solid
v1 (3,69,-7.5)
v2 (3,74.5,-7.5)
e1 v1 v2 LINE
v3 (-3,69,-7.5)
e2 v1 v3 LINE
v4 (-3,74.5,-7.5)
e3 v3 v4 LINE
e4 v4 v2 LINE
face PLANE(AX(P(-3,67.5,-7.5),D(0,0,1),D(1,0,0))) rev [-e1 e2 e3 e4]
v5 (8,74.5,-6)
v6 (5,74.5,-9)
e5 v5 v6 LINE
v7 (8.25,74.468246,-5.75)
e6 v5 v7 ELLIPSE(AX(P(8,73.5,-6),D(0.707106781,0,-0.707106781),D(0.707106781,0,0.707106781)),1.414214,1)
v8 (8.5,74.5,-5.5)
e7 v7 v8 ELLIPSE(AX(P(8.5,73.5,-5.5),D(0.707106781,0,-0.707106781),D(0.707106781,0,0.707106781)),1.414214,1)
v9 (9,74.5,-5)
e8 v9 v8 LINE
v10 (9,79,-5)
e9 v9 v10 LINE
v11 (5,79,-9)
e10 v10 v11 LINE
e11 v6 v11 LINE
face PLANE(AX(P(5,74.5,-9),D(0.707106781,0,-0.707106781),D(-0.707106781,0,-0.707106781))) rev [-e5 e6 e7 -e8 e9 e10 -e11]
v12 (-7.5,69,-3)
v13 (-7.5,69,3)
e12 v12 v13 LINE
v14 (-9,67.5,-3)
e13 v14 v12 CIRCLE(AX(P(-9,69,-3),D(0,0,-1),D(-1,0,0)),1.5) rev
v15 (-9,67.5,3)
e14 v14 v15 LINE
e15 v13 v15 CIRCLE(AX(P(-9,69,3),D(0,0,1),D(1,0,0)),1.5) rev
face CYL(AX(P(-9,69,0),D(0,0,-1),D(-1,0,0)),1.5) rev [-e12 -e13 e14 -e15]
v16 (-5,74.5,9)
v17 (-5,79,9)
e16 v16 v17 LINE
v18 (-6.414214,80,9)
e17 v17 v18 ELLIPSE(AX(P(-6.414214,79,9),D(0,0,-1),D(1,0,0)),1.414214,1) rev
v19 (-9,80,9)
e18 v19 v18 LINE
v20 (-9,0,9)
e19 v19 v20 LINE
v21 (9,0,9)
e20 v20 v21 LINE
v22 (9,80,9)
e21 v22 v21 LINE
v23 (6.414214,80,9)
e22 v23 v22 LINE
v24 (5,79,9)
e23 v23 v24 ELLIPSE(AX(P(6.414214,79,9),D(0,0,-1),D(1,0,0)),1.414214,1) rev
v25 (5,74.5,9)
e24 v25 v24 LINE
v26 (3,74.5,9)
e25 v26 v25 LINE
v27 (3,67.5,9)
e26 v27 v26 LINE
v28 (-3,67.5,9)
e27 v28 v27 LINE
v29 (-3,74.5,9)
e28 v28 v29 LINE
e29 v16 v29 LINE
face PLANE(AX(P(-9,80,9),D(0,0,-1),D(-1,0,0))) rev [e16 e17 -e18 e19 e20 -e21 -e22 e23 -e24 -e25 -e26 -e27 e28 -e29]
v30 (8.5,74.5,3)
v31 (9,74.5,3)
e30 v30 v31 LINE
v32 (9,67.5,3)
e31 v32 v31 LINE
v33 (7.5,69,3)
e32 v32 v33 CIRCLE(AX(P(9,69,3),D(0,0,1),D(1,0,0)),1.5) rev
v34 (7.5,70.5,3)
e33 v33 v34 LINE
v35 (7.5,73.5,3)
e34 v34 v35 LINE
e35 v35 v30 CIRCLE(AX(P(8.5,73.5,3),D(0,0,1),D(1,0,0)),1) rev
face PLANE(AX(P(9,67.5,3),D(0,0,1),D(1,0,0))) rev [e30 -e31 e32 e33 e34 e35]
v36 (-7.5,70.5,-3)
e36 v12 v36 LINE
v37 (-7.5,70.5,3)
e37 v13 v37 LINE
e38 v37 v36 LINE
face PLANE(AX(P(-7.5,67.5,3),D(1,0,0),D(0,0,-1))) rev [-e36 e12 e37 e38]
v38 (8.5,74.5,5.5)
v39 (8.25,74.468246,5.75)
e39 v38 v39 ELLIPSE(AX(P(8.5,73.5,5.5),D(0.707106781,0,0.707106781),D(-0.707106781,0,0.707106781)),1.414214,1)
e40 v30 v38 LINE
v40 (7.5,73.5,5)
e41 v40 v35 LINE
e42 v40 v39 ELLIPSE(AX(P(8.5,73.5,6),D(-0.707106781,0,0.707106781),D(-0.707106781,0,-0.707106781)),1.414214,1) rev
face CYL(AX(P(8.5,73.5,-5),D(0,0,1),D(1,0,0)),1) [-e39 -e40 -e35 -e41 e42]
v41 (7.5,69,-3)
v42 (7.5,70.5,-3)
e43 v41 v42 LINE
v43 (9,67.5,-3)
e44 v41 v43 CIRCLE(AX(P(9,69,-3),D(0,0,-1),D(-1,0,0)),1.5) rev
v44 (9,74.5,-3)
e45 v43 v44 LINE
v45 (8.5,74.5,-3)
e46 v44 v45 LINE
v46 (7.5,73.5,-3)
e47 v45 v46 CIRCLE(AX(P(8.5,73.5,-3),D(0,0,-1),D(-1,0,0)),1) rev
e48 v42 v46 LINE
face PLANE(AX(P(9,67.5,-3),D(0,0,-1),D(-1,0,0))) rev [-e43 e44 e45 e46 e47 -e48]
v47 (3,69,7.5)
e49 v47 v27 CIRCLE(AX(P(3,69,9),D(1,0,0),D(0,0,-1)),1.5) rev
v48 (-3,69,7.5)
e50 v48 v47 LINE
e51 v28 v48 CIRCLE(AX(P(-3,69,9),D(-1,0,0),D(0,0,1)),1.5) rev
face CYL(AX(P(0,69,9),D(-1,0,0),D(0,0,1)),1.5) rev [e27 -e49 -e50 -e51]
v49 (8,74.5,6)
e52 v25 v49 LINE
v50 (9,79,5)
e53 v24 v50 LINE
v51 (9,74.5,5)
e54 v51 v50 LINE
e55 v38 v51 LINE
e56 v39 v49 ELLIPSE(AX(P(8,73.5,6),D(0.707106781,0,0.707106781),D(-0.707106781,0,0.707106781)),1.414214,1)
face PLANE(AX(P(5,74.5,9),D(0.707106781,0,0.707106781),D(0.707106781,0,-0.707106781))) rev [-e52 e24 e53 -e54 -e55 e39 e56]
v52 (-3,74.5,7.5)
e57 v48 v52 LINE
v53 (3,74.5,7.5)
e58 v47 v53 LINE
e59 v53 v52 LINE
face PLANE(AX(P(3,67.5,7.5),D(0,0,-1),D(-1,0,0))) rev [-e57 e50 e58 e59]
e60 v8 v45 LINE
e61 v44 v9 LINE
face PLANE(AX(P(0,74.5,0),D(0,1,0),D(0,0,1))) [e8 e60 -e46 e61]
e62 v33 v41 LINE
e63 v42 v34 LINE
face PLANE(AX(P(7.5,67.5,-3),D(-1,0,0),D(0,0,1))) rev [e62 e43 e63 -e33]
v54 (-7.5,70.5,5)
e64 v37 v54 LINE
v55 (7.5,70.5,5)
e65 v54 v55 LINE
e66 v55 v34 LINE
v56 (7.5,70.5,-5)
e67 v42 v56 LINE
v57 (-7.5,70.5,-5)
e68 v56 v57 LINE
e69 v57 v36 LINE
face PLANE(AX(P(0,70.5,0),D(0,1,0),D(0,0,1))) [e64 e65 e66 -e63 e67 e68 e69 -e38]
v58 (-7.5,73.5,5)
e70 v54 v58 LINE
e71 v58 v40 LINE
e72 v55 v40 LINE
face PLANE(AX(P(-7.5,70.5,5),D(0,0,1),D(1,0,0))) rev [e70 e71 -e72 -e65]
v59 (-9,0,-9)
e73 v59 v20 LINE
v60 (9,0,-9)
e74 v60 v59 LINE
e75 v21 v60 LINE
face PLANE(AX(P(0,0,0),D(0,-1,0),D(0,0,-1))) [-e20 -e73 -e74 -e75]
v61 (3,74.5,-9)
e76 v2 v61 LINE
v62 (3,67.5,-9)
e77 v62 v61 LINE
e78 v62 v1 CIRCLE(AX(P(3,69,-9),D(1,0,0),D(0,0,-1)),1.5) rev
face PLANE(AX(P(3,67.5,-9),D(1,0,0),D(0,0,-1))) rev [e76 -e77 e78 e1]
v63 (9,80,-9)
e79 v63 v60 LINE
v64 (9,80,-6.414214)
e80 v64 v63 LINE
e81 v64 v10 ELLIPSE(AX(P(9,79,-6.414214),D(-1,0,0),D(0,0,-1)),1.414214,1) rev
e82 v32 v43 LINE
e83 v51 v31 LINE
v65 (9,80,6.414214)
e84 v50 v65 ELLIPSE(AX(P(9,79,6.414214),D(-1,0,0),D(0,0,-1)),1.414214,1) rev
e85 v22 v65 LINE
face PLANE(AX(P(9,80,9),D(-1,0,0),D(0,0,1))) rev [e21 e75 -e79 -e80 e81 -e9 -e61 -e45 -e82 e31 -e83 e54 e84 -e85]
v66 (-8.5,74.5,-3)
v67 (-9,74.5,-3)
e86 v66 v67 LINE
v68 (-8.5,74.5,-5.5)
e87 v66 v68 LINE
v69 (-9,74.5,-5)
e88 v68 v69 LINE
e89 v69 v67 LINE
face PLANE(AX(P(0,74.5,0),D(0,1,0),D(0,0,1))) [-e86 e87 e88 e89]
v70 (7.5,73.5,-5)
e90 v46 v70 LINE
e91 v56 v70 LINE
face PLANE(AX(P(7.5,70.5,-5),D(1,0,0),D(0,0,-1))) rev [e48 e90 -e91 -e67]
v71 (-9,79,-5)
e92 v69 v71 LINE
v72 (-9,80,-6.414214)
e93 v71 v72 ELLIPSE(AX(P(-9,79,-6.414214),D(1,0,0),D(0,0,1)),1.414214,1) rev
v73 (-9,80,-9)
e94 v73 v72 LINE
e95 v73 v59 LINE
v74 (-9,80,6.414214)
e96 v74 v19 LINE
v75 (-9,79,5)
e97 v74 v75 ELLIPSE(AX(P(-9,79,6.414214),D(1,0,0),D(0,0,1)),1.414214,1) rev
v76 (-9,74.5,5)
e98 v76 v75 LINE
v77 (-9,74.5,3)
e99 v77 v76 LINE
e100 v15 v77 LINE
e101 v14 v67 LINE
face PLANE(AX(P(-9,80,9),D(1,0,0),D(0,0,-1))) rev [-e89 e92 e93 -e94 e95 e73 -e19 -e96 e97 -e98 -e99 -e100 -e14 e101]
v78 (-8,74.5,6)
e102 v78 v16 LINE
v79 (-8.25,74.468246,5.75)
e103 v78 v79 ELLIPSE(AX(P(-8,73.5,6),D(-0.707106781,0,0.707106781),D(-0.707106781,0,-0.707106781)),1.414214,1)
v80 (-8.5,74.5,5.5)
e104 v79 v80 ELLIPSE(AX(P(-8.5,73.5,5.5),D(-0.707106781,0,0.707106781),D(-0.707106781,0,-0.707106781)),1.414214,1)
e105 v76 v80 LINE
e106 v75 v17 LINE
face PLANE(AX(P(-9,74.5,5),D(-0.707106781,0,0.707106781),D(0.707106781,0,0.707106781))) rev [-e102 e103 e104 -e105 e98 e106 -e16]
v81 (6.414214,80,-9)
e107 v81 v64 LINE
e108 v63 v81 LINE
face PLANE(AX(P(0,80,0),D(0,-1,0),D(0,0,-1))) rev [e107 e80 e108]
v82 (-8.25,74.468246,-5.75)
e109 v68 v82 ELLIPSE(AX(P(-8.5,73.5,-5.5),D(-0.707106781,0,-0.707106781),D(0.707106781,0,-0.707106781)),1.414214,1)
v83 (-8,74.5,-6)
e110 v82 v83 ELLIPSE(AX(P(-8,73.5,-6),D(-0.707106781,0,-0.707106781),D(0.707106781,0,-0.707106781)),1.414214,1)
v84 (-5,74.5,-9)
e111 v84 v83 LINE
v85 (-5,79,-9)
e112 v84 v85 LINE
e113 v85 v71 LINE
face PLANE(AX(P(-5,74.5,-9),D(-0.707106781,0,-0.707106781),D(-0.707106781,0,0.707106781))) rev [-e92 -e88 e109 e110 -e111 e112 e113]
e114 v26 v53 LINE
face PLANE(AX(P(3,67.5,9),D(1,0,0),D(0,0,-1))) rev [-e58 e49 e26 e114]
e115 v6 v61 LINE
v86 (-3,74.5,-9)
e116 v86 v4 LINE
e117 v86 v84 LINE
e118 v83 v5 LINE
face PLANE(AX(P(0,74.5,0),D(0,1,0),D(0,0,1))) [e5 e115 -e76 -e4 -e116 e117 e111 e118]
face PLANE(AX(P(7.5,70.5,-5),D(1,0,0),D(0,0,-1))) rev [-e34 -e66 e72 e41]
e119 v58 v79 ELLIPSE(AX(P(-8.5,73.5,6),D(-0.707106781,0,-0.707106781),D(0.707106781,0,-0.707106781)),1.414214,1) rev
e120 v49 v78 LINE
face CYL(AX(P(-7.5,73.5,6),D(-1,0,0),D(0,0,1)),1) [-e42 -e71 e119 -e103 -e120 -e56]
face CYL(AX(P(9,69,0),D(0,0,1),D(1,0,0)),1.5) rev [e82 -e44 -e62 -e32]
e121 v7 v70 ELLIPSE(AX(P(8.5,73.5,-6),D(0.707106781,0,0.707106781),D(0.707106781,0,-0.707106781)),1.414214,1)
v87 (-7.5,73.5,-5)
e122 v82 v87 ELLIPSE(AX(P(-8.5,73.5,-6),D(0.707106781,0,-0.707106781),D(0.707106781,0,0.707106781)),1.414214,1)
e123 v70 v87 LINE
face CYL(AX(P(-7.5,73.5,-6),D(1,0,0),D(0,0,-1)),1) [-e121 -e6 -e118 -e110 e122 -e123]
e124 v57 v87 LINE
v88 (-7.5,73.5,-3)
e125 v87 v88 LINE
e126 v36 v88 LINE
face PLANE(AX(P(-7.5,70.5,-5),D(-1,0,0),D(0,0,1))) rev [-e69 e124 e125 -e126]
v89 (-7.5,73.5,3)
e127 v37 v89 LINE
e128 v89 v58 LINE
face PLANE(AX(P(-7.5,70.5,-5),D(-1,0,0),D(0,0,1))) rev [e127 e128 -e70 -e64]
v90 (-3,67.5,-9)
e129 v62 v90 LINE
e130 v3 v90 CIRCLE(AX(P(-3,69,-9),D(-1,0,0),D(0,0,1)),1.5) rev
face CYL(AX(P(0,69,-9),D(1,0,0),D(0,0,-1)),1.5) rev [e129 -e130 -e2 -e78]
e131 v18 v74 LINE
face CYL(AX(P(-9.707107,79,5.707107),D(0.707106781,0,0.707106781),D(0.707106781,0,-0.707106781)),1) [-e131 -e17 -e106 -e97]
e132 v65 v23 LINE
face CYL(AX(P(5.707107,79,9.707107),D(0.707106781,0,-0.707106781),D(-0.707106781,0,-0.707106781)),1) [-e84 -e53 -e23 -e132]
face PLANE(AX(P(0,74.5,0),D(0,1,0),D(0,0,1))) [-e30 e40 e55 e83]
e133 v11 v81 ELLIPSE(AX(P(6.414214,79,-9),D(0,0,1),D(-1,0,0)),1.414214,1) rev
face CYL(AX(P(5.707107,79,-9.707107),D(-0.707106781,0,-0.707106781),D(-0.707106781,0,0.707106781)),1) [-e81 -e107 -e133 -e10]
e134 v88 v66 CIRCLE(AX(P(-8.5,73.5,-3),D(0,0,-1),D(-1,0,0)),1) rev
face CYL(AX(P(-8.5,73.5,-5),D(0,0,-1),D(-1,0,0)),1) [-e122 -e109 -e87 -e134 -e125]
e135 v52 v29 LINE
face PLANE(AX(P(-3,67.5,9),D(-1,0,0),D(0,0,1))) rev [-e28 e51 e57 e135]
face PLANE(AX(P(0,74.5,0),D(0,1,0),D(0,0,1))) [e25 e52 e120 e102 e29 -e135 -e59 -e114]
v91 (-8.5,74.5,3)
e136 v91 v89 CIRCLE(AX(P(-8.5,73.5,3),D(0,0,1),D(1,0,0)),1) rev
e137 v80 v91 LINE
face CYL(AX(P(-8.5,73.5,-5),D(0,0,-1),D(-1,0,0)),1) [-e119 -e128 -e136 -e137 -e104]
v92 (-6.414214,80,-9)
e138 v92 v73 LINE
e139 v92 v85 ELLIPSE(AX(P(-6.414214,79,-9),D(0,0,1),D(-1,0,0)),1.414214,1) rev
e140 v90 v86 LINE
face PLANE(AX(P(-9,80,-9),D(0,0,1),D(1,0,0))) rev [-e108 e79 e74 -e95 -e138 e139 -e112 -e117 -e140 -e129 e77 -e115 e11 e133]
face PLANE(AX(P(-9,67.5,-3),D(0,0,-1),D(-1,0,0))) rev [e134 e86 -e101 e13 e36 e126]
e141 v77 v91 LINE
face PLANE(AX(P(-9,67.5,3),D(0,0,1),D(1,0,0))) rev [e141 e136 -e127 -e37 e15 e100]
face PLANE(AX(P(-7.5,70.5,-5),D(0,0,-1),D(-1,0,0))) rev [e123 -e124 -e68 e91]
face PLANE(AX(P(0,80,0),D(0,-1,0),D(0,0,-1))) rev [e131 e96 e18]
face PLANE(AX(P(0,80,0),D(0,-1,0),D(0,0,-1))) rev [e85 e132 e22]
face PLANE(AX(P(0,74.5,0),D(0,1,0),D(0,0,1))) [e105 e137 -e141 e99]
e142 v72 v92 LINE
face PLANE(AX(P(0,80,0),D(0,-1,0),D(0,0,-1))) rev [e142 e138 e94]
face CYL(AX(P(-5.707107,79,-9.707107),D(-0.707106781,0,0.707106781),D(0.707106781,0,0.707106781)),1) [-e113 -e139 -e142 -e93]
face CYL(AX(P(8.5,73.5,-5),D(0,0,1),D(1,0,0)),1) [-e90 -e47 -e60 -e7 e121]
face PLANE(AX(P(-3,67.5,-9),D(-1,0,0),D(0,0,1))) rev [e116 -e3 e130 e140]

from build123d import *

# Parameters (mm, degrees)
SKETCH1_W           = 18
SKETCH1_H           = 18
BOSS_EXTRUDE1_DEPTH = 80
CUT_EXTRUDE1_DEPTH  = 5.5
SKETCH3_W           = 15
SKETCH3_H           = 10
CUT_EXTRUDE2_DEPTH  = 4
FILLET1_R           = 1
SKETCH4_W           = 6
SKETCH4_H           = 1.5
SKETCH4_W_2         = 1.5
SKETCH4_H_2         = 6
CUT_EXTRUDE3_DEPTH  = 7
FILLET2_R           = 1.5


# Some blends are built 0.0001 mm under size
with BuildPart() as part:
    # Sketch1 → Boss-Extrude1 (new body)
    with BuildSketch(Plane(origin=(0, 0, 0), x_dir=(1, 0, 0), z_dir=(0, 1, 0))):
        Rectangle(SKETCH1_W, SKETCH1_H)
    extrude(amount=BOSS_EXTRUDE1_DEPTH)

    # Sketch2 → Cut-Extrude1 (cut)
    with BuildSketch(Plane(origin=(0, 80, 0), x_dir=(1, 0, 0), z_dir=(0, 1, 0))):
        Polygon((-5, 9), (5, 9), (9, 5), (9, -5), (5, -9), (-5, -9), (-9, -5), (-9, 5), align=None)
    extrude(amount=-CUT_EXTRUDE1_DEPTH, mode=Mode.SUBTRACT)

    # Sketch3 → Cut-Extrude2 (cut)
    with BuildSketch(Plane(origin=(0, 74.5, 0), x_dir=(1, 0, 0), z_dir=(0, 1, 0))):
        Rectangle(SKETCH3_W, SKETCH3_H)
    extrude(amount=-CUT_EXTRUDE2_DEPTH, mode=Mode.SUBTRACT)

    # Fillet1
    # the kernel refuses this fillet: 1 mm, written as the material it takes off along each edge
    with BuildSketch(Plane(origin=(-10.767766953, 80, -3.232233047), x_dir=(0, -1, 0), z_dir=(0.7071067811865476, 0, -0.7071067811865476))) as fillet1_piece_1_section:
        with BuildLine():
            CenterArc((FILLET1_R, FILLET1_R), FILLET1_R, 180, 90)
            Line((0, FILLET1_R), (-FILLET1_R * 0.02, FILLET1_R))
            Line((-FILLET1_R * 0.02, FILLET1_R), (-FILLET1_R * 0.02, -FILLET1_R * 0.02))
            Line((-FILLET1_R * 0.02, -FILLET1_R * 0.02), (FILLET1_R, -FILLET1_R * 0.02))
            Line((FILLET1_R, -FILLET1_R * 0.02), (FILLET1_R, 0))
        make_face()
    fillet1_piece_1 = extrude(amount=10.656854249, mode=Mode.PRIVATE)
    fillet1_piece_1 = split(fillet1_piece_1, bisect_by=Plane(origin=(-9, 79.763052859, -7.147455413), z_dir=(1, 0, 0)), keep=Keep.TOP, mode=Mode.PRIVATE)
    fillet1_piece_1 = split(fillet1_piece_1, bisect_by=Plane(origin=(-7.147455413, 79.763052859, -9), z_dir=(0, 0, 1)), keep=Keep.TOP, mode=Mode.PRIVATE)
    add(fillet1_piece_1, mode=Mode.SUBTRACT)
    with BuildSketch(Plane(origin=(-3.232233047, 80, 10.767766953), x_dir=(0, -1, 0), z_dir=(-0.7071067811865477, 0, -0.7071067811865475))) as fillet1_piece_2_section:
        with BuildLine():
            CenterArc((FILLET1_R, FILLET1_R), FILLET1_R, 180, 90)
            Line((0, FILLET1_R), (-FILLET1_R * 0.02, FILLET1_R))
            Line((-FILLET1_R * 0.02, FILLET1_R), (-FILLET1_R * 0.02, -FILLET1_R * 0.02))
            Line((-FILLET1_R * 0.02, -FILLET1_R * 0.02), (FILLET1_R, -FILLET1_R * 0.02))
            Line((FILLET1_R, -FILLET1_R * 0.02), (FILLET1_R, 0))
        make_face()
    fillet1_piece_2 = extrude(amount=10.656854249, mode=Mode.PRIVATE)
    fillet1_piece_2 = split(fillet1_piece_2, bisect_by=Plane(origin=(-7.147455413, 79.763052859, 9), z_dir=(0, 0, -1)), keep=Keep.TOP, mode=Mode.PRIVATE)
    fillet1_piece_2 = split(fillet1_piece_2, bisect_by=Plane(origin=(-9, 79.763052859, 7.147455413), z_dir=(1, 0, 0)), keep=Keep.TOP, mode=Mode.PRIVATE)
    add(fillet1_piece_2, mode=Mode.SUBTRACT)
    with BuildSketch(Plane(origin=(10.767766953, 80, 3.232233047), x_dir=(0.7071067811865475, 0, 0.7071067811865477), z_dir=(-0.7071067811865477, 0, 0.7071067811865475))) as fillet1_piece_3_section:
        with BuildLine():
            CenterArc((FILLET1_R, -FILLET1_R), FILLET1_R, 90, 90)
            Line((0, -FILLET1_R), (-FILLET1_R * 0.02, -FILLET1_R))
            Line((-FILLET1_R * 0.02, -FILLET1_R), (-FILLET1_R * 0.02, FILLET1_R * 0.02))
            Line((-FILLET1_R * 0.02, FILLET1_R * 0.02), (FILLET1_R, FILLET1_R * 0.02))
            Line((FILLET1_R, FILLET1_R * 0.02), (FILLET1_R, 0))
        make_face()
    fillet1_piece_3 = extrude(amount=10.656854249, mode=Mode.PRIVATE)
    fillet1_piece_3 = split(fillet1_piece_3, bisect_by=Plane(origin=(7.147455413, 79.763052859, 9), z_dir=(0, 0, -1)), keep=Keep.TOP, mode=Mode.PRIVATE)
    fillet1_piece_3 = split(fillet1_piece_3, bisect_by=Plane(origin=(9, 79.763052859, 7.147455413), z_dir=(-1, 0, 0)), keep=Keep.TOP, mode=Mode.PRIVATE)
    add(fillet1_piece_3, mode=Mode.SUBTRACT)
    with BuildSketch(Plane(origin=(3.232233047, 80, -10.767766953), x_dir=(0.7071067811865476, 0, -0.7071067811865476), z_dir=(0.7071067811865476, 0, 0.7071067811865476))) as fillet1_piece_4_section:
        with BuildLine():
            CenterArc((FILLET1_R, -FILLET1_R), FILLET1_R, 90, 90)
            Line((0, -FILLET1_R), (-FILLET1_R * 0.02, -FILLET1_R))
            Line((-FILLET1_R * 0.02, -FILLET1_R), (-FILLET1_R * 0.02, FILLET1_R * 0.02))
            Line((-FILLET1_R * 0.02, FILLET1_R * 0.02), (FILLET1_R, FILLET1_R * 0.02))
            Line((FILLET1_R, FILLET1_R * 0.02), (FILLET1_R, 0))
        make_face()
    fillet1_piece_4 = extrude(amount=10.656854249, mode=Mode.PRIVATE)
    fillet1_piece_4 = split(fillet1_piece_4, bisect_by=Plane(origin=(9, 79.763052859, -7.147455413), z_dir=(-1, 0, 0)), keep=Keep.TOP, mode=Mode.PRIVATE)
    fillet1_piece_4 = split(fillet1_piece_4, bisect_by=Plane(origin=(7.147455413, 79.763052859, -9), z_dir=(0, 0, 1)), keep=Keep.TOP, mode=Mode.PRIVATE)
    add(fillet1_piece_4, mode=Mode.SUBTRACT)
    with BuildSketch(Plane(origin=(7.5, 74.5, -5), x_dir=(1, 0, 0), z_dir=(0, 0, 1)), Plane(origin=(-7.5, 74.5, 5), x_dir=(-1, 0, 0), z_dir=(0, 0, -1))) as fillet1_piece_5:
        with BuildLine():
            CenterArc((FILLET1_R, -FILLET1_R), FILLET1_R, 90, 90)
            Line((0, -FILLET1_R), (-FILLET1_R * 0.02, -FILLET1_R))
            Line((-FILLET1_R * 0.02, -FILLET1_R), (-FILLET1_R * 0.02, FILLET1_R * 0.02))
            Line((-FILLET1_R * 0.02, FILLET1_R * 0.02), (FILLET1_R, FILLET1_R * 0.02))
            Line((FILLET1_R, FILLET1_R * 0.02), (FILLET1_R, 0))
        make_face()
    extrude(amount=10, mode=Mode.SUBTRACT)
    with BuildSketch(Plane(origin=(-7.5, 74.5, -5), x_dir=(0, 0, -1), z_dir=(1, 0, 0)), Plane(origin=(7.5, 74.5, 5), x_dir=(0, 0, 1), z_dir=(-1, 0, 0))) as fillet1_piece_6:
        with BuildLine():
            CenterArc((FILLET1_R, -FILLET1_R), FILLET1_R, 90, 90)
            Line((0, -FILLET1_R), (-FILLET1_R * 0.02, -FILLET1_R))
            Line((-FILLET1_R * 0.02, -FILLET1_R), (-FILLET1_R * 0.02, FILLET1_R * 0.02))
            Line((-FILLET1_R * 0.02, FILLET1_R * 0.02), (FILLET1_R, FILLET1_R * 0.02))
            Line((FILLET1_R, FILLET1_R * 0.02), (FILLET1_R, 0))
        make_face()
    extrude(amount=15, mode=Mode.SUBTRACT)
    with BuildSketch(Plane(origin=(-7.5, 74.5, -5), x_dir=(0, 0, -1), z_dir=(1, 0, 0))) as fillet1_piece_7a_section:
        with BuildLine():
            CenterArc((FILLET1_R, -FILLET1_R), FILLET1_R, 90, 90)
            Line((0, -FILLET1_R), (-FILLET1_R * 0.02, -FILLET1_R))
            Line((-FILLET1_R * 0.02, -FILLET1_R), (-FILLET1_R * 0.02, FILLET1_R * 0.02))
            Line((-FILLET1_R * 0.02, FILLET1_R * 0.02), (FILLET1_R, FILLET1_R * 0.02))
            Line((FILLET1_R, FILLET1_R * 0.02), (FILLET1_R, 0))
        make_face()
    fillet1_piece_7a = extrude(amount=17.5, mode=Mode.PRIVATE)
    fillet1_piece_7a = split(fillet1_piece_7a, bisect_by=Plane(origin=(8.48257281, 74.252046622, -5.51742719), z_dir=(-0.7071067811865476, 0, 0.7071067811865476)), keep=Keep.TOP, mode=Mode.PRIVATE)
    fillet1_piece_7a = split(fillet1_piece_7a, bisect_by=Plane(origin=(7.5, 74.252046622, -5.189902921), z_dir=(1, 0, 0)), keep=Keep.TOP, mode=Mode.PRIVATE)
    with BuildSketch(Plane(origin=(7.5, 74.5, -7.5), x_dir=(1, 0, 0), z_dir=(0, 0, 1))) as fillet1_piece_7b_section:
        with BuildLine():
            CenterArc((FILLET1_R, -FILLET1_R), FILLET1_R, 90, 90)
            Line((0, -FILLET1_R), (-FILLET1_R * 0.02, -FILLET1_R))
            Line((-FILLET1_R * 0.02, -FILLET1_R), (-FILLET1_R * 0.02, FILLET1_R * 0.02))
            Line((-FILLET1_R * 0.02, FILLET1_R * 0.02), (FILLET1_R, FILLET1_R * 0.02))
            Line((FILLET1_R, FILLET1_R * 0.02), (FILLET1_R, 0))
        make_face()
    fillet1_piece_7b = extrude(amount=12.5, mode=Mode.PRIVATE)
    fillet1_piece_7b = split(fillet1_piece_7b, bisect_by=Plane(origin=(8.01742719, 74.252046622, -5.98257281), z_dir=(-0.7071067811865476, 0, 0.7071067811865476)), keep=Keep.TOP, mode=Mode.PRIVATE)
    fillet1_piece_7b = split(fillet1_piece_7b, bisect_by=Plane(origin=(7.689902921, 74.252046622, -5), z_dir=(0, 0, -1)), keep=Keep.TOP, mode=Mode.PRIVATE)
    fillet1_piece_7 = fillet1_piece_7a & fillet1_piece_7b
    add(fillet1_piece_7, mode=Mode.SUBTRACT)
    with BuildSketch(Plane(origin=(7.5, 74.5, -5), x_dir=(1, 0, 0), z_dir=(0, 0, 1))) as fillet1_piece_8a_section:
        with BuildLine():
            CenterArc((FILLET1_R, -FILLET1_R), FILLET1_R, 90, 90)
            Line((0, -FILLET1_R), (-FILLET1_R * 0.02, -FILLET1_R))
            Line((-FILLET1_R * 0.02, -FILLET1_R), (-FILLET1_R * 0.02, FILLET1_R * 0.02))
            Line((-FILLET1_R * 0.02, FILLET1_R * 0.02), (FILLET1_R, FILLET1_R * 0.02))
            Line((FILLET1_R, FILLET1_R * 0.02), (FILLET1_R, 0))
        make_face()
    fillet1_piece_8a = extrude(amount=12.5, mode=Mode.PRIVATE)
    fillet1_piece_8a = split(fillet1_piece_8a, bisect_by=Plane(origin=(8.01742719, 74.252046622, 5.98257281), z_dir=(-0.7071067811865475, 0, -0.7071067811865477)), keep=Keep.TOP, mode=Mode.PRIVATE)
    fillet1_piece_8a = split(fillet1_piece_8a, bisect_by=Plane(origin=(7.689902921, 74.252046622, 5), z_dir=(0, 0, 1)), keep=Keep.TOP, mode=Mode.PRIVATE)
    with BuildSketch(Plane(origin=(10, 74.5, 5), x_dir=(0, 0, 1), z_dir=(-1, 0, 0))) as fillet1_piece_8b_section:
        with BuildLine():
            CenterArc((FILLET1_R, -FILLET1_R), FILLET1_R, 90, 90)
            Line((0, -FILLET1_R), (-FILLET1_R * 0.02, -FILLET1_R))
            Line((-FILLET1_R * 0.02, -FILLET1_R), (-FILLET1_R * 0.02, FILLET1_R * 0.02))
            Line((-FILLET1_R * 0.02, FILLET1_R * 0.02), (FILLET1_R, FILLET1_R * 0.02))
            Line((FILLET1_R, FILLET1_R * 0.02), (FILLET1_R, 0))
        make_face()
    fillet1_piece_8b = extrude(amount=17.5, mode=Mode.PRIVATE)
    fillet1_piece_8b = split(fillet1_piece_8b, bisect_by=Plane(origin=(8.48257281, 74.252046622, 5.51742719), z_dir=(-0.7071067811865475, 0, -0.7071067811865477)), keep=Keep.TOP, mode=Mode.PRIVATE)
    fillet1_piece_8b = split(fillet1_piece_8b, bisect_by=Plane(origin=(7.5, 74.252046622, 5.189902921), z_dir=(1, 0, 0)), keep=Keep.TOP, mode=Mode.PRIVATE)
    fillet1_piece_8 = fillet1_piece_8a & fillet1_piece_8b
    add(fillet1_piece_8, mode=Mode.SUBTRACT)
    with BuildSketch(Plane(origin=(-10, 74.5, -5), x_dir=(0, 0, -1), z_dir=(1, 0, 0))) as fillet1_piece_9a_section:
        with BuildLine():
            CenterArc((FILLET1_R, -FILLET1_R), FILLET1_R, 90, 90)
            Line((0, -FILLET1_R), (-FILLET1_R * 0.02, -FILLET1_R))
            Line((-FILLET1_R * 0.02, -FILLET1_R), (-FILLET1_R * 0.02, FILLET1_R * 0.02))
            Line((-FILLET1_R * 0.02, FILLET1_R * 0.02), (FILLET1_R, FILLET1_R * 0.02))
            Line((FILLET1_R, FILLET1_R * 0.02), (FILLET1_R, 0))
        make_face()
    fillet1_piece_9a = extrude(amount=17.5, mode=Mode.PRIVATE)
    fillet1_piece_9a = split(fillet1_piece_9a, bisect_by=Plane(origin=(-8.48257281, 74.252046622, -5.51742719), z_dir=(0.7071067811865476, 0, 0.7071067811865476)), keep=Keep.TOP, mode=Mode.PRIVATE)
    fillet1_piece_9a = split(fillet1_piece_9a, bisect_by=Plane(origin=(-7.5, 74.252046622, -5.189902921), z_dir=(-1, 0, 0)), keep=Keep.TOP, mode=Mode.PRIVATE)
    with BuildSketch(Plane(origin=(-7.5, 74.5, 5), x_dir=(-1, 0, 0), z_dir=(0, 0, -1))) as fillet1_piece_9b_section:
        with BuildLine():
            CenterArc((FILLET1_R, -FILLET1_R), FILLET1_R, 90, 90)
            Line((0, -FILLET1_R), (-FILLET1_R * 0.02, -FILLET1_R))
            Line((-FILLET1_R * 0.02, -FILLET1_R), (-FILLET1_R * 0.02, FILLET1_R * 0.02))
            Line((-FILLET1_R * 0.02, FILLET1_R * 0.02), (FILLET1_R, FILLET1_R * 0.02))
            Line((FILLET1_R, FILLET1_R * 0.02), (FILLET1_R, 0))
        make_face()
    fillet1_piece_9b = extrude(amount=12.5, mode=Mode.PRIVATE)
    fillet1_piece_9b = split(fillet1_piece_9b, bisect_by=Plane(origin=(-8.01742719, 74.252046622, -5.98257281), z_dir=(0.7071067811865476, 0, 0.7071067811865476)), keep=Keep.TOP, mode=Mode.PRIVATE)
    fillet1_piece_9b = split(fillet1_piece_9b, bisect_by=Plane(origin=(-7.689902921, 74.252046622, -5), z_dir=(0, 0, -1)), keep=Keep.TOP, mode=Mode.PRIVATE)
    fillet1_piece_9 = fillet1_piece_9a & fillet1_piece_9b
    add(fillet1_piece_9, mode=Mode.SUBTRACT)
    with BuildSketch(Plane(origin=(7.5, 74.5, 5), x_dir=(0, 0, 1), z_dir=(-1, 0, 0))) as fillet1_piece_10a_section:
        with BuildLine():
            CenterArc((FILLET1_R, -FILLET1_R), FILLET1_R, 90, 90)
            Line((0, -FILLET1_R), (-FILLET1_R * 0.02, -FILLET1_R))
            Line((-FILLET1_R * 0.02, -FILLET1_R), (-FILLET1_R * 0.02, FILLET1_R * 0.02))
            Line((-FILLET1_R * 0.02, FILLET1_R * 0.02), (FILLET1_R, FILLET1_R * 0.02))
            Line((FILLET1_R, FILLET1_R * 0.02), (FILLET1_R, 0))
        make_face()
    fillet1_piece_10a = extrude(amount=17.5, mode=Mode.PRIVATE)
    fillet1_piece_10a = split(fillet1_piece_10a, bisect_by=Plane(origin=(-8.48257281, 74.252046622, 5.51742719), z_dir=(0.7071067811865475, 0, -0.7071067811865477)), keep=Keep.TOP, mode=Mode.PRIVATE)
    fillet1_piece_10a = split(fillet1_piece_10a, bisect_by=Plane(origin=(-7.5, 74.252046622, 5.189902921), z_dir=(-1, 0, 0)), keep=Keep.TOP, mode=Mode.PRIVATE)
    with BuildSketch(Plane(origin=(-7.5, 74.5, 7.5), x_dir=(-1, 0, 0), z_dir=(0, 0, -1))) as fillet1_piece_10b_section:
        with BuildLine():
            CenterArc((FILLET1_R, -FILLET1_R), FILLET1_R, 90, 90)
            Line((0, -FILLET1_R), (-FILLET1_R * 0.02, -FILLET1_R))
            Line((-FILLET1_R * 0.02, -FILLET1_R), (-FILLET1_R * 0.02, FILLET1_R * 0.02))
            Line((-FILLET1_R * 0.02, FILLET1_R * 0.02), (FILLET1_R, FILLET1_R * 0.02))
            Line((FILLET1_R, FILLET1_R * 0.02), (FILLET1_R, 0))
        make_face()
    fillet1_piece_10b = extrude(amount=12.5, mode=Mode.PRIVATE)
    fillet1_piece_10b = split(fillet1_piece_10b, bisect_by=Plane(origin=(-8.01742719, 74.252046622, 5.98257281), z_dir=(0.7071067811865475, 0, -0.7071067811865477)), keep=Keep.TOP, mode=Mode.PRIVATE)
    fillet1_piece_10b = split(fillet1_piece_10b, bisect_by=Plane(origin=(-7.689902921, 74.252046622, 5), z_dir=(0, 0, 1)), keep=Keep.TOP, mode=Mode.PRIVATE)
    fillet1_piece_10 = fillet1_piece_10a & fillet1_piece_10b
    add(fillet1_piece_10, mode=Mode.SUBTRACT)

    # Sketch4 → Cut-Extrude3 (cut)
    with BuildSketch(Plane(origin=(0, 74.5, 0), x_dir=(1, 0, 0), z_dir=(0, 1, 0))):
        with Locations((0, 8.25)):
            Rectangle(SKETCH4_W, SKETCH4_H)
        with Locations((8.25, 0)):
            Rectangle(SKETCH4_W_2, SKETCH4_H_2)
        with Locations((0, -8.25)):
            Rectangle(SKETCH4_W, SKETCH4_H)
        with Locations((-8.25, 0)):
            Rectangle(SKETCH4_W_2, SKETCH4_H_2)
    extrude(amount=-CUT_EXTRUDE3_DEPTH, mode=Mode.SUBTRACT)

    # Fillet2
    fillet2_edges = [part.edges().sort_by_distance(p)[0] for p in [
        (0, 67.5, -7.5),
        (-7.5, 67.5, 0),
        (0, 67.5, 7.5),
        (7.5, 67.5, 0),
    ]]
    fillet(fillet2_edges, radius=FILLET2_R - 0.0001)  # a hair under: the kernel refuses the full size


solid = part.part
